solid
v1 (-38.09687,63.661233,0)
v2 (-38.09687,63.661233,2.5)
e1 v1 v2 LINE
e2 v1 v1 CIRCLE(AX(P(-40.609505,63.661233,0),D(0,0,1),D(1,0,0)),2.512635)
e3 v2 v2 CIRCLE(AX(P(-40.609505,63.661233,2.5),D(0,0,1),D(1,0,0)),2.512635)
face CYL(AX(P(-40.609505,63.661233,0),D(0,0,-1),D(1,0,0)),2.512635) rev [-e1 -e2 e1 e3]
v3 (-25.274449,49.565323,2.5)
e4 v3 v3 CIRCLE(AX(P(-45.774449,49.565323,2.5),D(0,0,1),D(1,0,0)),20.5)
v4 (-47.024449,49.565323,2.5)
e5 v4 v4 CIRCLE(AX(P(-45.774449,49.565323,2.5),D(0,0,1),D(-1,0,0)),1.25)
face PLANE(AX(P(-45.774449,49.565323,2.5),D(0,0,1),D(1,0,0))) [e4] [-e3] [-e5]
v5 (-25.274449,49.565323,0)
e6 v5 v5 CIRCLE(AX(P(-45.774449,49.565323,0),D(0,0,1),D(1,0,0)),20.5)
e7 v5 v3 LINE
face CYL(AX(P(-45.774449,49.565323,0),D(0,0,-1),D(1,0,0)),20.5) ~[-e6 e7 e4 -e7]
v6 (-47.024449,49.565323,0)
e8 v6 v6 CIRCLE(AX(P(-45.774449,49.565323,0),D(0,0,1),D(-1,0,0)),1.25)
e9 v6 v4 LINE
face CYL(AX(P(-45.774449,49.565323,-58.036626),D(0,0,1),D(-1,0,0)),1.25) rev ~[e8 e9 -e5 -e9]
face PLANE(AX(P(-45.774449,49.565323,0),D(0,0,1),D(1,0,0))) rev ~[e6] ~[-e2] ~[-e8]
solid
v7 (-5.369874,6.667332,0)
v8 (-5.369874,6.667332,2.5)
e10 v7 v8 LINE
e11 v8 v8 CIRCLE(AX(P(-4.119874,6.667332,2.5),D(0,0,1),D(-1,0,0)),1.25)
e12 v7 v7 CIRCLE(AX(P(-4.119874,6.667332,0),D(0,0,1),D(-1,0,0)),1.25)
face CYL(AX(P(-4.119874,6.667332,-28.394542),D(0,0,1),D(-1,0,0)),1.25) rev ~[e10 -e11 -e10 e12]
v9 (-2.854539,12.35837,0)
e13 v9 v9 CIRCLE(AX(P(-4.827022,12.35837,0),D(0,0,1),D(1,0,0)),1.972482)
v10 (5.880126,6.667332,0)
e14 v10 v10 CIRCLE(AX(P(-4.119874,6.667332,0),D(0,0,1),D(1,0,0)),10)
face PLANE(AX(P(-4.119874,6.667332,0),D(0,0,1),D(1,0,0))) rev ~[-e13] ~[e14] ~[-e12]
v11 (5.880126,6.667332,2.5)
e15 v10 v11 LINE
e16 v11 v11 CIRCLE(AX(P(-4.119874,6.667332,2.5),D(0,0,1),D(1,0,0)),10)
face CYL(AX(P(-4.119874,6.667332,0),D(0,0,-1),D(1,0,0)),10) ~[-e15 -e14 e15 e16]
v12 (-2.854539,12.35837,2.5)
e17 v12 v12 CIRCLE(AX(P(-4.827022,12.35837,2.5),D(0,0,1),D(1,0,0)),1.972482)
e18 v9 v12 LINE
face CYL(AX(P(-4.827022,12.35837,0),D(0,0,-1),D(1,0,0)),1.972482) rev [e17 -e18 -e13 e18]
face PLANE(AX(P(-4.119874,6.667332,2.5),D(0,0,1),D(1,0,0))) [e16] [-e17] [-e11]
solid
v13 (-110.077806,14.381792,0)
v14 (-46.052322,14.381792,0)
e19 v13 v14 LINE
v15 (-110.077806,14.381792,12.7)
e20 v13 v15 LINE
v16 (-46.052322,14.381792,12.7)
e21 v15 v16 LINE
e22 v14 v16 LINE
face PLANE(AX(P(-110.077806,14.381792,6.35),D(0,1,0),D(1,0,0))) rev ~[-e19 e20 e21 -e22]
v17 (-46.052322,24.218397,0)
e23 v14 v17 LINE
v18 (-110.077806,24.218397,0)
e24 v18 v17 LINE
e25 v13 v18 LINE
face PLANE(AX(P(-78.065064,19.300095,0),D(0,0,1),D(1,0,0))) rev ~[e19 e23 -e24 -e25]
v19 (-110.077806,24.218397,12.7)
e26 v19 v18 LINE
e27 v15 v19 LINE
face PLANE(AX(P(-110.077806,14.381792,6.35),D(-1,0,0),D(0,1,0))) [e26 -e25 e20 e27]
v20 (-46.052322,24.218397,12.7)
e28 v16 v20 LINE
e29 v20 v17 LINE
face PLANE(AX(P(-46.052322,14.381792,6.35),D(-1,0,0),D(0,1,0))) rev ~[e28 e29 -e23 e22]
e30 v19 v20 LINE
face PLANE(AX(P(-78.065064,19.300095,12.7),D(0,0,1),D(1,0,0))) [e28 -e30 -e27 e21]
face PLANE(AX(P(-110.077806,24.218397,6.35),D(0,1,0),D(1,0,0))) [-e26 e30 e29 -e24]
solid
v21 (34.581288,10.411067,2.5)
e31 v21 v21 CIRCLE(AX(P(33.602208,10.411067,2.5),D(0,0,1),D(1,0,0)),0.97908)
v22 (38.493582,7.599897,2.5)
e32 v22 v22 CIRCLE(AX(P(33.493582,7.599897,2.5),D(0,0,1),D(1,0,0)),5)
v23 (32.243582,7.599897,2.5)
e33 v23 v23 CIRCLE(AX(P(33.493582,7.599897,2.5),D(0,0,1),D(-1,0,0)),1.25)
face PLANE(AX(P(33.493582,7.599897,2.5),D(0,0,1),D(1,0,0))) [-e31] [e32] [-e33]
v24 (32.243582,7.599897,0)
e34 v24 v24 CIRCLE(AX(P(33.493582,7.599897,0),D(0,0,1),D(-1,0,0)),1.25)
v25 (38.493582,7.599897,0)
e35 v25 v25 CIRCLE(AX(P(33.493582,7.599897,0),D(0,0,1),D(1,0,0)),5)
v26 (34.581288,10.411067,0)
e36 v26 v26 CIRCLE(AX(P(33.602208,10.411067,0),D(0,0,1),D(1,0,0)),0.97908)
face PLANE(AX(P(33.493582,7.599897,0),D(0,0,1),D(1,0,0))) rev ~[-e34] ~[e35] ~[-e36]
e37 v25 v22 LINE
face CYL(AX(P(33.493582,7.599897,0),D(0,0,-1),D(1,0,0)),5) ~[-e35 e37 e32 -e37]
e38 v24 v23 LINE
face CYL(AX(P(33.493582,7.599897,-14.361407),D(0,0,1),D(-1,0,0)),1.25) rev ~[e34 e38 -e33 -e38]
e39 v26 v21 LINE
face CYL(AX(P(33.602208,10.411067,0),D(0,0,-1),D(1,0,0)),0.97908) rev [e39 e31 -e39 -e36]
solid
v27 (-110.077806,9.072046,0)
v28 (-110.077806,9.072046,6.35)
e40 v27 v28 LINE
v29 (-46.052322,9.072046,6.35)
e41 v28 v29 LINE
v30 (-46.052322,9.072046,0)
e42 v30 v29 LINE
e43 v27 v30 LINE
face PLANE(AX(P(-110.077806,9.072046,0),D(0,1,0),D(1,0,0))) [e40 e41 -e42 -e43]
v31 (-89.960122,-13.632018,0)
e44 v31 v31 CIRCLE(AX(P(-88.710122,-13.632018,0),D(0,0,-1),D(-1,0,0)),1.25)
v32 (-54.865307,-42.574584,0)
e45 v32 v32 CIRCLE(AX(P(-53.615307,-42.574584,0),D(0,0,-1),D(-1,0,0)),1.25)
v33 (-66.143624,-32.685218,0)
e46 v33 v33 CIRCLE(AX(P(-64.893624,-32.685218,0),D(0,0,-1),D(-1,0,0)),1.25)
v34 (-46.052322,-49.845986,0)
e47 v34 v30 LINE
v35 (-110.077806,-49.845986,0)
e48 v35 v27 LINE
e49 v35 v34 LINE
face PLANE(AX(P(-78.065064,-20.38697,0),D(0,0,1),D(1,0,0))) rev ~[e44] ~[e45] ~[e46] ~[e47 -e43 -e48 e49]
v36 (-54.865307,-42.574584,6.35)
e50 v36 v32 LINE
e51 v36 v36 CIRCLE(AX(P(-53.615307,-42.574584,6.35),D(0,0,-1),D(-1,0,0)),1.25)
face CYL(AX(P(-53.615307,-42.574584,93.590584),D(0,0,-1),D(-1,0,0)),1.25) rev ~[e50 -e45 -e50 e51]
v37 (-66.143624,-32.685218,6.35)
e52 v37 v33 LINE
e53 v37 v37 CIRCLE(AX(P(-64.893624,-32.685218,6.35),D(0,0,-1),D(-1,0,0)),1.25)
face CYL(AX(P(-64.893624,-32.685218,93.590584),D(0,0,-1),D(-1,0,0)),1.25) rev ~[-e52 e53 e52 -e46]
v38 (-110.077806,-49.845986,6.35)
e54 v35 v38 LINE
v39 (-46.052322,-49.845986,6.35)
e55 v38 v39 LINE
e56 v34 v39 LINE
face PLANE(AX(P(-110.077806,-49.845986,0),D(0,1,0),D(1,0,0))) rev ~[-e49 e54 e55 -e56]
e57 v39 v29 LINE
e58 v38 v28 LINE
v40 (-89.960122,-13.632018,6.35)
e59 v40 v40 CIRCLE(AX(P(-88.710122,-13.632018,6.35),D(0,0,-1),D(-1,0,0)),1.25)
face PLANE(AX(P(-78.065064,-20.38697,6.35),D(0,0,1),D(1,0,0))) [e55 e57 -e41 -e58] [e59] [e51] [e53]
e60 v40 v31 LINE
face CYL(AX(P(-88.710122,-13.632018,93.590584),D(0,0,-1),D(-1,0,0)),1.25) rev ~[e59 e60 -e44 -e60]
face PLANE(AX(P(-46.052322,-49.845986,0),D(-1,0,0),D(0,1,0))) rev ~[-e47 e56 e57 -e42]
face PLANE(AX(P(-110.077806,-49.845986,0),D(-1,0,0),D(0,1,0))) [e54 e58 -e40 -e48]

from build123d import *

# Parameters (mm, degrees)
F1_R             = 10
F1_R_2           = 1.9724824491
F2_DEPTH         = 2.5
F1_R_3           = 5
F1_R_4           = 0.9790800152
F0_R             = 20.5
F0_R_2           = 2.5126354118
F3_W             = 64.0254840255
F3_H             = 58.9180318639
F4_DEPTH         = 6.35
F3_H_2           = 9.8366048187
F5_DEPTH         = 6.35
F6_D             = 2.5
F8_D             = 2.5
F8_COPIES_COUNT  = 2
F8_COPIES_PITCH  = 30.5
F8_COPIES1_COUNT = 2
F8_COPIES1_PITCH = 45.489759
F10_D            = 2.5
F10_2_D          = 2.5


# Not quite as in the source:
# - a feature of the source that left no trace in its solid (it failed there, or was rolled back) is left out
# - a pattern or mirror of a feature is missing from the dataset's text; its kind, count and spacing are read off the source's solid


with BuildPart() as f2:
    # F1 (on Top) → F2 (new body)
    with BuildSketch(Plane.XY):
        with Locations((-4.1198744439, 6.6673322581)):
            Circle(F1_R)
        with Locations((-4.8270216212, 12.3583702371)):
            Circle(F1_R_2, mode=Mode.SUBTRACT)
    extrude(amount=F2_DEPTH)

    # F10 (through all)
    with Locations(Plane(origin=(0, 0, 0), x_dir=(1, 0, 0), z_dir=(0, 0, -1))):
        with Locations((-4.1198744439, -6.6673322581), (33.4935821593, -7.599897217)):
            Hole(F10_D / 2)


with BuildPart() as f2b:
    # F1 (on Top) → F2, piece 2 (new body)
    with BuildSketch(Plane.XY):
        with Locations((33.4935821593, 7.599897217)):
            Circle(F1_R_3)
        with Locations((33.6022078991, 10.4110669345)):
            Circle(F1_R_4, mode=Mode.SUBTRACT)
    extrude(amount=F2_DEPTH)

    # F10#2 (through all)
    with Locations(Plane(origin=(0, 0, 0), x_dir=(1, 0, 0), z_dir=(0, 0, -1))):
        with Locations((-4.1198744439, -6.6673322581), (33.4935821593, -7.599897217)):
            Hole(F10_2_D / 2)


with BuildPart() as f2c:
    # F0 (on Top) → F2, piece 3 (new body)
    with BuildSketch(Plane.XY):
        with Locations((-45.774448663, 49.5653226972)):
            Circle(F0_R)
        with Locations((-40.6095050275, 63.6612325907)):
            Circle(F0_R_2, mode=Mode.SUBTRACT)
    extrude(amount=F2_DEPTH)

    # F6 (through all)
    with Locations(Plane(origin=(0, 0, 0), x_dir=(1, 0, 0), z_dir=(0, 0, -1))):
        with Locations((-45.774448663, -49.5653226972)):
            Hole(F6_D / 2)


with BuildPart() as f4:
    # F3 (on Top) → F4 (new body)
    with BuildSketch(Plane.XY):
        with Locations((-78.0650638044, -20.3869701363)):
            Rectangle(F3_W, F3_H)
    extrude(amount=F4_DEPTH)

    # F8 (through all)
    with Locations(Plane.XY.offset(6.35)):
        with Locations((-88.7101224427, -13.6320184063)):
            f8 = Hole(F8_D / 2)

    # F8_copies: F8 ×2
    with Locations(*[Vector(0.7808687891, -0.6246950729, 0) * (i * F8_COPIES_PITCH) for i in range(1, F8_COPIES_COUNT)]):
        add(f8, mode=Mode.SUBTRACT)

    # F8_copies1: F8 ×2
    with Locations(*[Vector(0.7714882729, -0.636243542, 0) * (i * F8_COPIES1_PITCH) for i in range(1, F8_COPIES1_COUNT)]):
        add(f8, mode=Mode.SUBTRACT)


with BuildPart() as f4b:
    # F3 (on Top) → F4, piece 2 (new body)
    with BuildSketch(Plane.XY):
        with Locations((-78.0650638044, 19.3000948057)):
            Rectangle(F3_W, F3_H_2)
    extrude(amount=F4_DEPTH)

    # F5 (add): a face of the model
    f5_faces = [f4b.faces().sort_by_distance(p)[0] for p in [
        (-78.0650638044, 19.3000948057, 6.35),
    ]]
    extrude(f5_faces, amount=F5_DEPTH)


solid = Compound([f2.part, f2b.part, f2c.part, f4.part, f4b.part])
